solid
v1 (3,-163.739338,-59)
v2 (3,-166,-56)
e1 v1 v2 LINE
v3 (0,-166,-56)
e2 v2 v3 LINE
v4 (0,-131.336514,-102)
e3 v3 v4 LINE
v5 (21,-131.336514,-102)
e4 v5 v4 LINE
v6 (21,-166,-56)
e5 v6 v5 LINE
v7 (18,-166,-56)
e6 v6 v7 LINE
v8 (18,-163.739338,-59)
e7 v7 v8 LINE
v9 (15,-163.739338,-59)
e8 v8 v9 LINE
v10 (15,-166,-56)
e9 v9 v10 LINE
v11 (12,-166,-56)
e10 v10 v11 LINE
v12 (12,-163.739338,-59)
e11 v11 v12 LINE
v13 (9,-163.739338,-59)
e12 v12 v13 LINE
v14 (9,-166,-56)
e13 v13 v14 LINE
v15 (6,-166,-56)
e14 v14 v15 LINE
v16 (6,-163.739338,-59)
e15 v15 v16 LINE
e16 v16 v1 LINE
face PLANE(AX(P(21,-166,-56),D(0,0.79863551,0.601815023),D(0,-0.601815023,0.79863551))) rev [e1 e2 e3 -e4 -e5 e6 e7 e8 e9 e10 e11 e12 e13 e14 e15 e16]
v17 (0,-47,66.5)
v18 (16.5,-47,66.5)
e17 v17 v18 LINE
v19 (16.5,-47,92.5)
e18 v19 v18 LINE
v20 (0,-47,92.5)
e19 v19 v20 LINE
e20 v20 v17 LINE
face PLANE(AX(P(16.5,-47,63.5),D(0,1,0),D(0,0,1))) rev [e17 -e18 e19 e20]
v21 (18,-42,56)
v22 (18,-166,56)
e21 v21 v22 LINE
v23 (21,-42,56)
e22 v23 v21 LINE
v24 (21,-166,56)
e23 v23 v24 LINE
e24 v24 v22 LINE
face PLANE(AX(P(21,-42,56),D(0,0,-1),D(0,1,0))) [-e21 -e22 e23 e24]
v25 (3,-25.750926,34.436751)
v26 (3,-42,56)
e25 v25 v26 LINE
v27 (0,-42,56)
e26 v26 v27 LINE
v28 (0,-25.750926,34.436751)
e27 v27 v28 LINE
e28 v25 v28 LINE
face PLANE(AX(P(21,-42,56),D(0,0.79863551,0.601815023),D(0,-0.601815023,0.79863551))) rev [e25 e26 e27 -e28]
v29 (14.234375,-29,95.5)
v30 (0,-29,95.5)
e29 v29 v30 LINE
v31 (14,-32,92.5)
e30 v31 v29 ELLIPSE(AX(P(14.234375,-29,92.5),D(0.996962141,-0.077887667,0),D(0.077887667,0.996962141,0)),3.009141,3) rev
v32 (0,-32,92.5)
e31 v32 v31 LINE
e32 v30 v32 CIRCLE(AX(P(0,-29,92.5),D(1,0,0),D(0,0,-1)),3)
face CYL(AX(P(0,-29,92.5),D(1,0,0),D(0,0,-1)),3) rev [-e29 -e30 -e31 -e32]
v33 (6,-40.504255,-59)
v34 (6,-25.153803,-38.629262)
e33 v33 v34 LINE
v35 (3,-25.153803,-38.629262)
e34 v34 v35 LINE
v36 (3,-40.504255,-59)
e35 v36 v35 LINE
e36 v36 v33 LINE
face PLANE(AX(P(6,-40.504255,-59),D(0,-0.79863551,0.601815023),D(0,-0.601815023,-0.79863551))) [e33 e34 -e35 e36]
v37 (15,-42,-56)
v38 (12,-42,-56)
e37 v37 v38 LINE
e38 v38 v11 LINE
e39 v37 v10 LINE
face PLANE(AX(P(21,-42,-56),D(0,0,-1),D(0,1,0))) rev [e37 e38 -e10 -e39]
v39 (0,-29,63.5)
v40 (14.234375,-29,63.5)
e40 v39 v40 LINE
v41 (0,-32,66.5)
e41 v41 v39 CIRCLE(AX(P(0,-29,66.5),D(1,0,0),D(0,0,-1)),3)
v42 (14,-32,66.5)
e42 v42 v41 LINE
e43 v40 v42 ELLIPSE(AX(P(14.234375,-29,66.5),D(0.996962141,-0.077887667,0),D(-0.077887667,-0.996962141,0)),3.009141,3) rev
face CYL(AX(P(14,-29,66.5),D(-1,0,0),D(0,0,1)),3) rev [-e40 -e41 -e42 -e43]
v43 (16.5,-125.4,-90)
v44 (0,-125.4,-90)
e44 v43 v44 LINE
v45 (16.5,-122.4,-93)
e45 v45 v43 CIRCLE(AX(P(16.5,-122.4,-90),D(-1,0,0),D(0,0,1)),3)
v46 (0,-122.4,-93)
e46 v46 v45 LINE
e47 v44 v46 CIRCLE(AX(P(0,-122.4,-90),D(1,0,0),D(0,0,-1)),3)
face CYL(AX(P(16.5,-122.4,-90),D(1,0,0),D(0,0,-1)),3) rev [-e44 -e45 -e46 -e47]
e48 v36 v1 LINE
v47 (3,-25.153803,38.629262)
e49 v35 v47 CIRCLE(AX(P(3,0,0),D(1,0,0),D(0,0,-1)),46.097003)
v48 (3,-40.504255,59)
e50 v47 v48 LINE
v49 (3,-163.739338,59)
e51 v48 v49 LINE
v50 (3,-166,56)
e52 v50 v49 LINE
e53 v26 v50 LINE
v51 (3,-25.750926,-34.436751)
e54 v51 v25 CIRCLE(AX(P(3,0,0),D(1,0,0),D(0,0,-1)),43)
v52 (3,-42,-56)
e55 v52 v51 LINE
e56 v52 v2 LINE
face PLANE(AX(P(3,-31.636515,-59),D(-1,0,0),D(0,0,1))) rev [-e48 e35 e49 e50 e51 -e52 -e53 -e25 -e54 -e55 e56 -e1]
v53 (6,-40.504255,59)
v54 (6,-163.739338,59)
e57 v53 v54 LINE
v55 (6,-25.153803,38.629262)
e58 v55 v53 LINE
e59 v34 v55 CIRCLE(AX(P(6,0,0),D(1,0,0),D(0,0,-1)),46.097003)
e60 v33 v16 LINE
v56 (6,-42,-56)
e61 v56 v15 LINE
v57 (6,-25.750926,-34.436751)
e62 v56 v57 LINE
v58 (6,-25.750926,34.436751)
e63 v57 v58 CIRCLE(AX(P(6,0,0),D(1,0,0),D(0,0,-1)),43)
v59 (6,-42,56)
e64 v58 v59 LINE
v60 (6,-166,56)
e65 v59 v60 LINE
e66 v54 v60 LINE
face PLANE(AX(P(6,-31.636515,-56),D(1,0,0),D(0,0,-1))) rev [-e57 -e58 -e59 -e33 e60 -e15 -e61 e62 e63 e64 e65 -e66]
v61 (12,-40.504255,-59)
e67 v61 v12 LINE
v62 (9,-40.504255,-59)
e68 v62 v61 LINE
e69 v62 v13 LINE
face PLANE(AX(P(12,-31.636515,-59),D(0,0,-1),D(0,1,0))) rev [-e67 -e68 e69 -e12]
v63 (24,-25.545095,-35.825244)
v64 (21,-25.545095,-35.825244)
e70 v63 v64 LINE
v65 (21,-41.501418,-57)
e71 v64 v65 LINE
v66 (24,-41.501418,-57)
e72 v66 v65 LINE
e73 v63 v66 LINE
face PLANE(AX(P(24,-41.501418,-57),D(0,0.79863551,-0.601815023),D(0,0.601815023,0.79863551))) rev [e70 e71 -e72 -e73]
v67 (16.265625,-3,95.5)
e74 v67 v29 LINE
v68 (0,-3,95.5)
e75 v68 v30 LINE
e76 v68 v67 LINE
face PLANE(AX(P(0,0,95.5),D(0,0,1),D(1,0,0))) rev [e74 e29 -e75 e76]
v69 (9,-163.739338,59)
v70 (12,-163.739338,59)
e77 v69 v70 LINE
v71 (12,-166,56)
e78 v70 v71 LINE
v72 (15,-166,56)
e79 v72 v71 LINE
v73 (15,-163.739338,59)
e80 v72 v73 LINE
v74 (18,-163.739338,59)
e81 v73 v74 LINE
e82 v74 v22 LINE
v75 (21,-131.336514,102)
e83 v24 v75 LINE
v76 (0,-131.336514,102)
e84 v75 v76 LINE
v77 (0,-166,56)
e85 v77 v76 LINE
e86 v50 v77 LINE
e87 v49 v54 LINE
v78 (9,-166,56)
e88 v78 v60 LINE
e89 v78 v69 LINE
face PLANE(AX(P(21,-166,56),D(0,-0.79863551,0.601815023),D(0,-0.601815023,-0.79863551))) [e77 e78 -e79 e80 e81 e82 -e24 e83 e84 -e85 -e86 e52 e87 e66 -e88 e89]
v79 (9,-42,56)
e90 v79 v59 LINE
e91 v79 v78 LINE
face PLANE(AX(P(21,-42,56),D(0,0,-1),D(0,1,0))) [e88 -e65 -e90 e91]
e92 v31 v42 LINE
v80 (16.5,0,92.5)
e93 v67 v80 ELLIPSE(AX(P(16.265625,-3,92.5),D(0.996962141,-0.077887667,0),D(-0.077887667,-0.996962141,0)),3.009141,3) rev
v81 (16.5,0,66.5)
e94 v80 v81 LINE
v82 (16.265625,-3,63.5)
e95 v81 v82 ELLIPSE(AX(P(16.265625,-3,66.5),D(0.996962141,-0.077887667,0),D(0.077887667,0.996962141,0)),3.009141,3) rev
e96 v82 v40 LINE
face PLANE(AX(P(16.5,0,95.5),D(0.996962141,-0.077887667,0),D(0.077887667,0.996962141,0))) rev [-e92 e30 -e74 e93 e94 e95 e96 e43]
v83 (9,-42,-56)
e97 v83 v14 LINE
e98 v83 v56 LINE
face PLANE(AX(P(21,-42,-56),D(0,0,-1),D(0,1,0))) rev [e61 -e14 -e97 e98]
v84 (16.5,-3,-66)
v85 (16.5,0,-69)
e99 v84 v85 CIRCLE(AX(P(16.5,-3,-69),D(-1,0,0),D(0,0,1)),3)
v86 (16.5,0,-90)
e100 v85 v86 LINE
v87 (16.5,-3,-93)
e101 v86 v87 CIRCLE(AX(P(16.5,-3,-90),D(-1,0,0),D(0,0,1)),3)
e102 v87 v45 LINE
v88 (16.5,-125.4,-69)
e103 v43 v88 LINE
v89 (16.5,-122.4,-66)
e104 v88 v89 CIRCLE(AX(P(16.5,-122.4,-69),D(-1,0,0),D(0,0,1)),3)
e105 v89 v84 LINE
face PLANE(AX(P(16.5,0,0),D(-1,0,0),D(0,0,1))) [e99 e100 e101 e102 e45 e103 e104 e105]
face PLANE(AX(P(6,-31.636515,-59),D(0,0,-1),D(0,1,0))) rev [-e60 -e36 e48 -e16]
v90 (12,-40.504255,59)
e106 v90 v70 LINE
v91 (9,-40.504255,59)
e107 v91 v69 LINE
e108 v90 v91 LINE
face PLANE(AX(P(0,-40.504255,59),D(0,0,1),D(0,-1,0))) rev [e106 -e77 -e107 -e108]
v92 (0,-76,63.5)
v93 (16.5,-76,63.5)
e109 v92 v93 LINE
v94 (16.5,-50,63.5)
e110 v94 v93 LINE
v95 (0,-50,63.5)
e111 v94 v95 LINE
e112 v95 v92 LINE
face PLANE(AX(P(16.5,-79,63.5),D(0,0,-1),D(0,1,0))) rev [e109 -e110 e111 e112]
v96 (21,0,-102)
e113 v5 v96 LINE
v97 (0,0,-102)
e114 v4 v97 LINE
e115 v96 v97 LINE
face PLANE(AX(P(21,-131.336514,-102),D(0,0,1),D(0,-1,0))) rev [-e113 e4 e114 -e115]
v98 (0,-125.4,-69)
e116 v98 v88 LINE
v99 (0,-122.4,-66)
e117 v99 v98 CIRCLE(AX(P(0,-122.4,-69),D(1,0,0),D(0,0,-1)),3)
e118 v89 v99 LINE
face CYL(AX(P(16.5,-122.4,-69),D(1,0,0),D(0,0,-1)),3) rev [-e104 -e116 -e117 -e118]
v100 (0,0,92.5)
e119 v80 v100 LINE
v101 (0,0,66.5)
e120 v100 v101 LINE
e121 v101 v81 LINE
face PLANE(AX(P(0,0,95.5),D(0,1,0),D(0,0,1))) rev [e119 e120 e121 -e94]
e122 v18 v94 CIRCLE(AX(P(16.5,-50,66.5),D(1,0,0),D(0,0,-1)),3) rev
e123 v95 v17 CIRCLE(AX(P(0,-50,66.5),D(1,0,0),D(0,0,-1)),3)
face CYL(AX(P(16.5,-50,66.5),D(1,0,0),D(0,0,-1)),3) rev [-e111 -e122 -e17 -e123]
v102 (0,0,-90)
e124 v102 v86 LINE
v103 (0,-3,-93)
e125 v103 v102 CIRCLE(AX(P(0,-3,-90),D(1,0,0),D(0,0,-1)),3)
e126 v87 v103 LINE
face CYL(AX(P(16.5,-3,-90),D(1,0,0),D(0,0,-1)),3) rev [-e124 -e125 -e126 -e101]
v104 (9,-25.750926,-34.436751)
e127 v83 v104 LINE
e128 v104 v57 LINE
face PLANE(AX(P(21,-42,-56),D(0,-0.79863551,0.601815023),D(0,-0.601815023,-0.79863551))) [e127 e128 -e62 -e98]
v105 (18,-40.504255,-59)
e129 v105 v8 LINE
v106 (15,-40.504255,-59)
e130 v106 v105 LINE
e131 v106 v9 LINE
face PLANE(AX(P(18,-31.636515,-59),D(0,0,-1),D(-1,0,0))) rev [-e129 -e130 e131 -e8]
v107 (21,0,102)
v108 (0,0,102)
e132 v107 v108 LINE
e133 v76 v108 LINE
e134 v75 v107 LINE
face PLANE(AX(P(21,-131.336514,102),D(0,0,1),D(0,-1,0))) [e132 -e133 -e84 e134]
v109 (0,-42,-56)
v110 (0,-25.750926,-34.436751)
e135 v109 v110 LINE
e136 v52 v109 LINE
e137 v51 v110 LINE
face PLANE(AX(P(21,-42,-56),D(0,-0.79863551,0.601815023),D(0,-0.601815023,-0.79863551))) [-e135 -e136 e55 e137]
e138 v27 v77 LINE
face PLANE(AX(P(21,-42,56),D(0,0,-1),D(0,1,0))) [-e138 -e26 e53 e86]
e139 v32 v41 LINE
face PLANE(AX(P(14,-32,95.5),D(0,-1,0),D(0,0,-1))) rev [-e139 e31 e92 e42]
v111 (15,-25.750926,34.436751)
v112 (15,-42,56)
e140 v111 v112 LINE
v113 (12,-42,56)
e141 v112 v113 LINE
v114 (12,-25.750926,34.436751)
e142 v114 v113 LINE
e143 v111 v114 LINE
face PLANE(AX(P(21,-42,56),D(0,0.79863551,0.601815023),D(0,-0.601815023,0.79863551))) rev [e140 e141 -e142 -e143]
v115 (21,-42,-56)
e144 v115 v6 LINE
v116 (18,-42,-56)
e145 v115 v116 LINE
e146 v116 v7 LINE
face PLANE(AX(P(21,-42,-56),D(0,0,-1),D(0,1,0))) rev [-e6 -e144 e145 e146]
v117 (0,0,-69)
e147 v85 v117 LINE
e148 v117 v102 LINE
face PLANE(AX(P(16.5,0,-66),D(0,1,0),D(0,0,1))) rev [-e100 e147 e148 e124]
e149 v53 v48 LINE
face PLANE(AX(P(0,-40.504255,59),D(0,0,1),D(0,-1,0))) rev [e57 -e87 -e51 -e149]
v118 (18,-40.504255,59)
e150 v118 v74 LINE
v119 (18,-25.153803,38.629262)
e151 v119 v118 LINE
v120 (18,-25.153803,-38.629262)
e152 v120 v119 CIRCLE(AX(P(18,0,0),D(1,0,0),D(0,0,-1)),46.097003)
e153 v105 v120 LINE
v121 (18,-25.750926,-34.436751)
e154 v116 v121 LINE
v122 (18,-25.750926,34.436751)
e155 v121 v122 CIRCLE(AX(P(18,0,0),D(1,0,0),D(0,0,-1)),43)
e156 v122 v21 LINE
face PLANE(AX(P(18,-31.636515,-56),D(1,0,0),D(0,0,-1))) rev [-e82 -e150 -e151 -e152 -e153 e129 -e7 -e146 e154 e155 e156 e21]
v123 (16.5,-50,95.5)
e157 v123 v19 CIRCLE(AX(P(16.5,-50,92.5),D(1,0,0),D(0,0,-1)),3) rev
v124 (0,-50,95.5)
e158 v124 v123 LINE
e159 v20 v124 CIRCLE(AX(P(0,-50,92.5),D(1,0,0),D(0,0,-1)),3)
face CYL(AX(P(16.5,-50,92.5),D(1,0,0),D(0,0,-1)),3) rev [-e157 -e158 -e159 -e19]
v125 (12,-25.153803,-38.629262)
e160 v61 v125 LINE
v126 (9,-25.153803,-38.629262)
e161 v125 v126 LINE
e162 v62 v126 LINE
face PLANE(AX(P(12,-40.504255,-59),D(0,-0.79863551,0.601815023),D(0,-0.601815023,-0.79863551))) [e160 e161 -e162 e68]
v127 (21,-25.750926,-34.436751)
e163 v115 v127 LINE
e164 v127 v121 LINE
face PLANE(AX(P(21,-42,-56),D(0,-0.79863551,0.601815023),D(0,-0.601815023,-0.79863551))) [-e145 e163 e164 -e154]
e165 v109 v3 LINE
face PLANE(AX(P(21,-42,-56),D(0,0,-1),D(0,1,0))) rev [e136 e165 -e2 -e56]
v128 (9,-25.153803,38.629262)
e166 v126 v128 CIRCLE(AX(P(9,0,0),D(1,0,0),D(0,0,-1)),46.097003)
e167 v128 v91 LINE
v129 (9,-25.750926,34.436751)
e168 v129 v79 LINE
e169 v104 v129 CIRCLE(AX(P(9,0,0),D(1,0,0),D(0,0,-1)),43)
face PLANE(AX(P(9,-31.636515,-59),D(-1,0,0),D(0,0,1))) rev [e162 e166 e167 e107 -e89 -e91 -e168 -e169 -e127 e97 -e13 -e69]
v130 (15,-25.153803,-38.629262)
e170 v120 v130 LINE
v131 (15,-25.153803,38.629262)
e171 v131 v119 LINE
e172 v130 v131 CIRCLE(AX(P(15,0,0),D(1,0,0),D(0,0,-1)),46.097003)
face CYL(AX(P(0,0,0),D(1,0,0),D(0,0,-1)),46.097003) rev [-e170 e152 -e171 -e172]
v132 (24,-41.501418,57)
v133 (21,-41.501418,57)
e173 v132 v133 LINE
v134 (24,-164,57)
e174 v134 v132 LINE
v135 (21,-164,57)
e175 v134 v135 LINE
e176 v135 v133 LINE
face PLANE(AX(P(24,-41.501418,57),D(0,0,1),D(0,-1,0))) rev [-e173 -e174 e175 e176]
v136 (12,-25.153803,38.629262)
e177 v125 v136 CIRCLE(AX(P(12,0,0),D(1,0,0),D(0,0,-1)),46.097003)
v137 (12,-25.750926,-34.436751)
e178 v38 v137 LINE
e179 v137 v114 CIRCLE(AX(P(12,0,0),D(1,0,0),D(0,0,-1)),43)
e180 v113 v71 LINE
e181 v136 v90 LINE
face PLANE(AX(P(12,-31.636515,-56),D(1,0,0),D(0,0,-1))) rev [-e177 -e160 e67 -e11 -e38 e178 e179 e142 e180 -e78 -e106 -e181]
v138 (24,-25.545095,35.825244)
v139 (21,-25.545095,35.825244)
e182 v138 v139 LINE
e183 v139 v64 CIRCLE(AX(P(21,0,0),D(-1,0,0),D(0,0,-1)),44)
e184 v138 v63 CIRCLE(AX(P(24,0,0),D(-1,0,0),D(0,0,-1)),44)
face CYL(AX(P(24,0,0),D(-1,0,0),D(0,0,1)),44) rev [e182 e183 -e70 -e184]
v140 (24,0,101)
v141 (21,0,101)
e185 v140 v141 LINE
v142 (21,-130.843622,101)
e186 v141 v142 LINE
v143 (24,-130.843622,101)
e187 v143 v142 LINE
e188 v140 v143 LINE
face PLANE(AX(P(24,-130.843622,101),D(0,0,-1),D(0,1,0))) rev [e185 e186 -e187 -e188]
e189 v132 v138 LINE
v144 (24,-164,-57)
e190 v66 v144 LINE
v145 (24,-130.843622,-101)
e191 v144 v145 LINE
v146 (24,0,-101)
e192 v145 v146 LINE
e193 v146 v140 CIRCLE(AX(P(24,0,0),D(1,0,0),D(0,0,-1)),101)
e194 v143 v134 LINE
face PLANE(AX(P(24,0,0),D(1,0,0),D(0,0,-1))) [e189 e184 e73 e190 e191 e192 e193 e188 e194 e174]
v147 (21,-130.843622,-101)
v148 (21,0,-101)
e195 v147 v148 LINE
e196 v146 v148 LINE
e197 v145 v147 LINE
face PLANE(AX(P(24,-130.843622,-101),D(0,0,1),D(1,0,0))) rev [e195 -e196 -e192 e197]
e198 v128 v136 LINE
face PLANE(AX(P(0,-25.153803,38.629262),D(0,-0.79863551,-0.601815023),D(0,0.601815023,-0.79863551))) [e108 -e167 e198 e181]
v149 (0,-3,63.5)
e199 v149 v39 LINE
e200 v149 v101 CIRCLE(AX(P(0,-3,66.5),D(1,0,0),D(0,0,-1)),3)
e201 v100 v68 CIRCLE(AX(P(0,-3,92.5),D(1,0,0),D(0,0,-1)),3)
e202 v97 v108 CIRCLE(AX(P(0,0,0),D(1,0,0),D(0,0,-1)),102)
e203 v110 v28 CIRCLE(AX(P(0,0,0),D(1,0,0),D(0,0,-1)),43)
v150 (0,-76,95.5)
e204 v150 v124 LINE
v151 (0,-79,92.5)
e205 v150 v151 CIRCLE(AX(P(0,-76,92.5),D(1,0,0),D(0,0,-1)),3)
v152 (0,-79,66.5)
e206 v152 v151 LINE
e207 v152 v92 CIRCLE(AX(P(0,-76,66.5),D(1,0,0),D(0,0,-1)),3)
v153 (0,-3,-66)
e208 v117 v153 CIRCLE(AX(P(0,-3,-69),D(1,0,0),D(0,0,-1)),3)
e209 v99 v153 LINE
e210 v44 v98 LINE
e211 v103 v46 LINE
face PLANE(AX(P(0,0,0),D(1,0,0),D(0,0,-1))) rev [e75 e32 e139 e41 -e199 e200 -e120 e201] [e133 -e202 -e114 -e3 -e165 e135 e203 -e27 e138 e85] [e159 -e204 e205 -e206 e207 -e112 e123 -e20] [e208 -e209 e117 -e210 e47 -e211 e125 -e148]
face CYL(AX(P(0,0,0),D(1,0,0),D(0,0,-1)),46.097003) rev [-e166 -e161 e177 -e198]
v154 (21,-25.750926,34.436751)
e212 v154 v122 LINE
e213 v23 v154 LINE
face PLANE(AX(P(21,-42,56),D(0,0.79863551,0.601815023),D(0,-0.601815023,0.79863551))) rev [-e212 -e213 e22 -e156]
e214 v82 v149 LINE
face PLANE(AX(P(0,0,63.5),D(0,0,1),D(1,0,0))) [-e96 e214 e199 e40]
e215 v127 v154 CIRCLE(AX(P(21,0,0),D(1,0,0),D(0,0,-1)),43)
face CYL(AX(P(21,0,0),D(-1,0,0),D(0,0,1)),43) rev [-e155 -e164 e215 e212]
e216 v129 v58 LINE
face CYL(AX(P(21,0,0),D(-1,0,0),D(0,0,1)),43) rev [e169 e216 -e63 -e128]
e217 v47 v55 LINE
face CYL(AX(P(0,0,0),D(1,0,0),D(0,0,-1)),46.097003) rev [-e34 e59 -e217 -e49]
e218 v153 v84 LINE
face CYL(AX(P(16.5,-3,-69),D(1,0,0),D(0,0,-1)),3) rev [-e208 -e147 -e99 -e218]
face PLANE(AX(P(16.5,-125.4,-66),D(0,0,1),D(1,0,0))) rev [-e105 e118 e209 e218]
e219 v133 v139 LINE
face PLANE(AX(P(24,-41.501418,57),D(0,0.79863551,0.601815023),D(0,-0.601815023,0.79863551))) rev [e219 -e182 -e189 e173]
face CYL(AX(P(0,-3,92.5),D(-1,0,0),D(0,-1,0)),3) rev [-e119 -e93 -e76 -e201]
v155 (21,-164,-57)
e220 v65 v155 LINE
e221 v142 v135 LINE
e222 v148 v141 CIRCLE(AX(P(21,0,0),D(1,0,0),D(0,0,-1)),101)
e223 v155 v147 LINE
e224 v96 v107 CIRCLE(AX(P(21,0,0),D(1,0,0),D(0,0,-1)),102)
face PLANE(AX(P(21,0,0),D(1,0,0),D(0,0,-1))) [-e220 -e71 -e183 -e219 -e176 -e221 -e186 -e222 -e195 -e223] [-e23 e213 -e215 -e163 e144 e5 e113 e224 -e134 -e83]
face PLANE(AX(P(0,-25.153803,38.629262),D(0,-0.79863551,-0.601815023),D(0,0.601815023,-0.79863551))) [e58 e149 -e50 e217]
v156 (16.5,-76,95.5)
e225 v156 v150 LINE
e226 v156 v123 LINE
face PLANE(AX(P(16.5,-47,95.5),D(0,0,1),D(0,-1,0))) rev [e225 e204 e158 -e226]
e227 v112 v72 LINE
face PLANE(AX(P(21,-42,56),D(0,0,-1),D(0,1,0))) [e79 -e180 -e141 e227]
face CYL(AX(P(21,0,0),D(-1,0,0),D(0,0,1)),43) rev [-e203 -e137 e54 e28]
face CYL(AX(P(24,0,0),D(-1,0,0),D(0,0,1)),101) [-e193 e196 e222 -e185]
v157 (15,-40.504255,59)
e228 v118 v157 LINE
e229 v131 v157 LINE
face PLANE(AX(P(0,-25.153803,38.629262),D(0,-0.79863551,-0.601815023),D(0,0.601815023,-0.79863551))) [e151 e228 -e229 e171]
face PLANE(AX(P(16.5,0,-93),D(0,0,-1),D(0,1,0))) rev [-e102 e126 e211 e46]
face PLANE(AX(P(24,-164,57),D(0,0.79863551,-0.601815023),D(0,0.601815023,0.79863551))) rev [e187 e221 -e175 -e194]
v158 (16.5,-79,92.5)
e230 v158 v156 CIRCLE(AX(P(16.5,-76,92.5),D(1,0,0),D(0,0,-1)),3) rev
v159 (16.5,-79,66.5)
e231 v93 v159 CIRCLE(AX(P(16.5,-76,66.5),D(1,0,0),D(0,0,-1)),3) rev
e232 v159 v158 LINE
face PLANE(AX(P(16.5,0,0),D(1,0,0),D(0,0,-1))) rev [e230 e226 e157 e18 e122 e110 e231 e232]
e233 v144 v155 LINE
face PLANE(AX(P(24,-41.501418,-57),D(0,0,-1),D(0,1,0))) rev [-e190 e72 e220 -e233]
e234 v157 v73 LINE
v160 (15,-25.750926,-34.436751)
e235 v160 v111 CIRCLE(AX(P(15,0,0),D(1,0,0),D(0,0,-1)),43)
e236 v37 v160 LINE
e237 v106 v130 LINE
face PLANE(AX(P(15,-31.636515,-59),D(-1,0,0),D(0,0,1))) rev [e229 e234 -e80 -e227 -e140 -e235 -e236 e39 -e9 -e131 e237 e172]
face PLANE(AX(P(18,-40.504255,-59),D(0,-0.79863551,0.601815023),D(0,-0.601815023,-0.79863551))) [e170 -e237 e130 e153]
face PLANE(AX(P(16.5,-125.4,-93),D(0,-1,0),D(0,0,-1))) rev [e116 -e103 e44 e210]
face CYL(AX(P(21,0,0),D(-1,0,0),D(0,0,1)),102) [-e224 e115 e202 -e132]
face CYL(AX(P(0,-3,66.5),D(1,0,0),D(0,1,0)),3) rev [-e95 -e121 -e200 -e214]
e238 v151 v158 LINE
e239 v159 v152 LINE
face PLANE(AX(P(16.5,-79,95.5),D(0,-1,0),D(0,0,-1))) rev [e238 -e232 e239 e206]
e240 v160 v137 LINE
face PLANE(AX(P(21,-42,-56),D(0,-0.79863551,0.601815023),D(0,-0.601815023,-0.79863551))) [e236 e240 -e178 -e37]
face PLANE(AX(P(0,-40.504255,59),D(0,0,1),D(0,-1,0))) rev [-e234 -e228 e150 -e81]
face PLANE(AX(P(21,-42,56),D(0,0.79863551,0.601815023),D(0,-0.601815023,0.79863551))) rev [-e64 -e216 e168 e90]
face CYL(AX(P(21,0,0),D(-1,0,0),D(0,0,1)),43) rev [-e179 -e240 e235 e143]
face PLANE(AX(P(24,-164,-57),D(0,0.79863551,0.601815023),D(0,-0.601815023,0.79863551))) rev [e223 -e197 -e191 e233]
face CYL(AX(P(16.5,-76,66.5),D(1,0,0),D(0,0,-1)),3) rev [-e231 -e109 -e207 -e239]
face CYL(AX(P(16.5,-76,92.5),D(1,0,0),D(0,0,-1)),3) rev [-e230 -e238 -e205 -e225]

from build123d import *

# Parameters (mm, degrees)
EXTRUDE_1_DEPTH     = 21
EXTRUDE_2_DEPTH     = 3
SKETCH_4_W          = 27
SKETCH_4_H          = 125.4
CUT_EXTRUDE_1_DEPTH = 16.5
CUT_EXTRUDE_3_DEPTH = 32
SKETCH_6_W          = 32
SKETCH_6_H          = 32
CUT_EXTRUDE_4_DEPTH = 16.5
FILLET_1_R          = 3
SWEEP_START         = 3
SWEEP_3_DEPTH       = 3
SWEEP_START_2       = 9
SWEEP_3_2_DEPTH     = 3
SWEEP_START_3       = 15
SWEEP_3_3_DEPTH     = 3


# Read off the part's stored shape, not the designer's step: Вырез-По траектории3
with BuildPart() as part:
    # Эскиз1 → Бобышка-Вытянуть1 (new body)
    with BuildSketch(Plane(origin=(0, 0, 0), x_dir=(0, 0, -1), z_dir=(1, 0, 0))):
        with BuildLine():
            Line((-56, -42), (-34.436750731, -25.75092618))
            ThreePointArc((-34.436750731, -25.75092618), (0, 43), (34.436750731, -25.75092618))
            Line((34.436750731, -25.75092618), (56, -42))
            Line((56, -42), (56, -166))
            Line((56, -166), (102, -131.336513695))
            Line((102, -131.336513695), (102, 0))
            ThreePointArc((102, 0), (0, 102), (-102, 0))
            Line((-102, 0), (-102, -131.336513695))
            Line((-102, -131.336513695), (-56, -166))
            Line((-56, -166), (-56, -42))
        make_face()
    extrude(amount=EXTRUDE_1_DEPTH)

    # Эскиз3 → Бобышка-Вытянуть2 (add)
    with BuildSketch(Plane(origin=(21, 0, 0), x_dir=(0, 0, -1), z_dir=(1, 0, 0))):
        with BuildLine():
            Line((-57, -41.501418392), (-35.82524401, -25.545095256))
            ThreePointArc((-35.82524401, -25.545095256), (0, 44), (35.82524401, -25.545095256))
            Line((35.82524401, -25.545095256), (57, -41.501418392))
            Line((57, -41.501418392), (57, -164))
            Line((57, -164), (101, -130.843621795))
            Line((101, -130.843621795), (101, 0))
            ThreePointArc((101, 0), (0, 101), (-101, 0))
            Line((-101, 0), (-101, -130.843621795))
            Line((-101, -130.843621795), (-57, -164))
            Line((-57, -164), (-57, -41.501418392))
        make_face()
    extrude(amount=EXTRUDE_2_DEPTH)

    # Эскиз4 → Вырез-Вытянуть1 (cut)
    with BuildSketch(Plane.ZY):
        with Locations((-79.5, -62.7)):
            Rectangle(SKETCH_4_W, SKETCH_4_H)
    extrude(amount=-CUT_EXTRUDE_1_DEPTH, mode=Mode.SUBTRACT)

    # Sketch 1 2 → Вырез-Вытянуть3 (cut)
    with BuildSketch(Plane(origin=(0, 0, 95.5), x_dir=(0.400818834019707, -0.9161573349021895, 0), z_dir=(0, 0, 1))):
        Polygon((0, 0), (29.317034717, -12.826202689), (34.928498393, 0), (6.613510761, 15.116596026), align=None)
    extrude(amount=-CUT_EXTRUDE_3_DEPTH, mode=Mode.SUBTRACT)

    # Эскиз6 → Вырез-Вытянуть4 (cut)
    with BuildSketch(Plane.ZY):
        with Locations((79.5, -63)):
            Rectangle(SKETCH_6_W, SKETCH_6_H)
    extrude(amount=-CUT_EXTRUDE_4_DEPTH, mode=Mode.SUBTRACT)

    # Скругление1
    fillet_1_edges = [part.edges().sort_by_distance(p)[0] for p in [
        (8.25, -125.4, -66),
        (8.25, -125.4, -93),
        (8.25, 0, -66),
        (8.25, 0, -93),
        (8.25, -79, 95.5),
        (8.25, -79, 63.5),
        (8.25, -47, 95.5),
        (8.25, -47, 63.5),
        (7, -32, 63.5),
        (7, -32, 95.5),
        (8.25, 0, 63.5),
        (8.25, 0, 95.5),
    ]]
    fillet(fillet_1_edges, radius=FILLET_1_R)

    # Вырез-По траектории3 outline → Вырез-По траектории3 (cut)
    with BuildSketch(Plane.YZ.offset(SWEEP_START)):
        with BuildLine():
            Line((-25.153803165, 38.62926215), (-40.504255176, 59))
            Line((-40.504255176, 59), (-163.73933785, 59))
            Line((-163.73933785, 59), (-166, 56))
            Line((-166, 56), (-42, 56))
            Line((-42, 56), (-25.75092618, 34.436750731))
            ThreePointArc((-25.75092618, 34.436750731), (43, 0), (-25.75092618, -34.436750731))
            Line((-25.75092618, -34.436750731), (-42, -56))
            Line((-42, -56), (-166, -56))
            Line((-166, -56), (-163.73933785, -59))
            Line((-163.73933785, -59), (-40.504255176, -59))
            Line((-40.504255176, -59), (-25.153803165, -38.62926215))
            ThreePointArc((-25.153803165, -38.62926215), (46.097003242, 0), (-25.153803165, 38.62926215))
        make_face()
    extrude(amount=SWEEP_3_DEPTH, mode=Mode.SUBTRACT)

    # Sweep 3 2 outline → Sweep 3 2 (cut)
    with BuildSketch(Plane.YZ.offset(SWEEP_START_2)):
        with BuildLine():
            Line((-25.153803165, 38.62926215), (-40.504255176, 59))
            Line((-40.504255176, 59), (-163.73933785, 59))
            Line((-163.73933785, 59), (-166, 56))
            Line((-166, 56), (-42, 56))
            Line((-42, 56), (-25.75092618, 34.436750731))
            ThreePointArc((-25.75092618, 34.436750731), (43, 0), (-25.75092618, -34.436750731))
            Line((-25.75092618, -34.436750731), (-42, -56))
            Line((-42, -56), (-166, -56))
            Line((-166, -56), (-163.73933785, -59))
            Line((-163.73933785, -59), (-40.504255176, -59))
            Line((-40.504255176, -59), (-25.153803165, -38.62926215))
            ThreePointArc((-25.153803165, -38.62926215), (46.097003242, 0), (-25.153803165, 38.62926215))
        make_face()
    extrude(amount=SWEEP_3_2_DEPTH, mode=Mode.SUBTRACT)

    # Sweep 3 3 outline → Sweep 3 3 (cut)
    with BuildSketch(Plane.YZ.offset(SWEEP_START_3)):
        with BuildLine():
            Line((-25.153803165, 38.62926215), (-40.504255176, 59))
            Line((-40.504255176, 59), (-163.73933785, 59))
            Line((-163.73933785, 59), (-166, 56))
            Line((-166, 56), (-42, 56))
            Line((-42, 56), (-25.75092618, 34.436750731))
            ThreePointArc((-25.75092618, 34.436750731), (43, 0), (-25.75092618, -34.436750731))
            Line((-25.75092618, -34.436750731), (-42, -56))
            Line((-42, -56), (-166, -56))
            Line((-166, -56), (-163.73933785, -59))
            Line((-163.73933785, -59), (-40.504255176, -59))
            Line((-40.504255176, -59), (-25.153803165, -38.62926215))
            ThreePointArc((-25.153803165, -38.62926215), (46.097003242, 0), (-25.153803165, 38.62926215))
        make_face()
    extrude(amount=SWEEP_3_3_DEPTH, mode=Mode.SUBTRACT)


solid = part.part
